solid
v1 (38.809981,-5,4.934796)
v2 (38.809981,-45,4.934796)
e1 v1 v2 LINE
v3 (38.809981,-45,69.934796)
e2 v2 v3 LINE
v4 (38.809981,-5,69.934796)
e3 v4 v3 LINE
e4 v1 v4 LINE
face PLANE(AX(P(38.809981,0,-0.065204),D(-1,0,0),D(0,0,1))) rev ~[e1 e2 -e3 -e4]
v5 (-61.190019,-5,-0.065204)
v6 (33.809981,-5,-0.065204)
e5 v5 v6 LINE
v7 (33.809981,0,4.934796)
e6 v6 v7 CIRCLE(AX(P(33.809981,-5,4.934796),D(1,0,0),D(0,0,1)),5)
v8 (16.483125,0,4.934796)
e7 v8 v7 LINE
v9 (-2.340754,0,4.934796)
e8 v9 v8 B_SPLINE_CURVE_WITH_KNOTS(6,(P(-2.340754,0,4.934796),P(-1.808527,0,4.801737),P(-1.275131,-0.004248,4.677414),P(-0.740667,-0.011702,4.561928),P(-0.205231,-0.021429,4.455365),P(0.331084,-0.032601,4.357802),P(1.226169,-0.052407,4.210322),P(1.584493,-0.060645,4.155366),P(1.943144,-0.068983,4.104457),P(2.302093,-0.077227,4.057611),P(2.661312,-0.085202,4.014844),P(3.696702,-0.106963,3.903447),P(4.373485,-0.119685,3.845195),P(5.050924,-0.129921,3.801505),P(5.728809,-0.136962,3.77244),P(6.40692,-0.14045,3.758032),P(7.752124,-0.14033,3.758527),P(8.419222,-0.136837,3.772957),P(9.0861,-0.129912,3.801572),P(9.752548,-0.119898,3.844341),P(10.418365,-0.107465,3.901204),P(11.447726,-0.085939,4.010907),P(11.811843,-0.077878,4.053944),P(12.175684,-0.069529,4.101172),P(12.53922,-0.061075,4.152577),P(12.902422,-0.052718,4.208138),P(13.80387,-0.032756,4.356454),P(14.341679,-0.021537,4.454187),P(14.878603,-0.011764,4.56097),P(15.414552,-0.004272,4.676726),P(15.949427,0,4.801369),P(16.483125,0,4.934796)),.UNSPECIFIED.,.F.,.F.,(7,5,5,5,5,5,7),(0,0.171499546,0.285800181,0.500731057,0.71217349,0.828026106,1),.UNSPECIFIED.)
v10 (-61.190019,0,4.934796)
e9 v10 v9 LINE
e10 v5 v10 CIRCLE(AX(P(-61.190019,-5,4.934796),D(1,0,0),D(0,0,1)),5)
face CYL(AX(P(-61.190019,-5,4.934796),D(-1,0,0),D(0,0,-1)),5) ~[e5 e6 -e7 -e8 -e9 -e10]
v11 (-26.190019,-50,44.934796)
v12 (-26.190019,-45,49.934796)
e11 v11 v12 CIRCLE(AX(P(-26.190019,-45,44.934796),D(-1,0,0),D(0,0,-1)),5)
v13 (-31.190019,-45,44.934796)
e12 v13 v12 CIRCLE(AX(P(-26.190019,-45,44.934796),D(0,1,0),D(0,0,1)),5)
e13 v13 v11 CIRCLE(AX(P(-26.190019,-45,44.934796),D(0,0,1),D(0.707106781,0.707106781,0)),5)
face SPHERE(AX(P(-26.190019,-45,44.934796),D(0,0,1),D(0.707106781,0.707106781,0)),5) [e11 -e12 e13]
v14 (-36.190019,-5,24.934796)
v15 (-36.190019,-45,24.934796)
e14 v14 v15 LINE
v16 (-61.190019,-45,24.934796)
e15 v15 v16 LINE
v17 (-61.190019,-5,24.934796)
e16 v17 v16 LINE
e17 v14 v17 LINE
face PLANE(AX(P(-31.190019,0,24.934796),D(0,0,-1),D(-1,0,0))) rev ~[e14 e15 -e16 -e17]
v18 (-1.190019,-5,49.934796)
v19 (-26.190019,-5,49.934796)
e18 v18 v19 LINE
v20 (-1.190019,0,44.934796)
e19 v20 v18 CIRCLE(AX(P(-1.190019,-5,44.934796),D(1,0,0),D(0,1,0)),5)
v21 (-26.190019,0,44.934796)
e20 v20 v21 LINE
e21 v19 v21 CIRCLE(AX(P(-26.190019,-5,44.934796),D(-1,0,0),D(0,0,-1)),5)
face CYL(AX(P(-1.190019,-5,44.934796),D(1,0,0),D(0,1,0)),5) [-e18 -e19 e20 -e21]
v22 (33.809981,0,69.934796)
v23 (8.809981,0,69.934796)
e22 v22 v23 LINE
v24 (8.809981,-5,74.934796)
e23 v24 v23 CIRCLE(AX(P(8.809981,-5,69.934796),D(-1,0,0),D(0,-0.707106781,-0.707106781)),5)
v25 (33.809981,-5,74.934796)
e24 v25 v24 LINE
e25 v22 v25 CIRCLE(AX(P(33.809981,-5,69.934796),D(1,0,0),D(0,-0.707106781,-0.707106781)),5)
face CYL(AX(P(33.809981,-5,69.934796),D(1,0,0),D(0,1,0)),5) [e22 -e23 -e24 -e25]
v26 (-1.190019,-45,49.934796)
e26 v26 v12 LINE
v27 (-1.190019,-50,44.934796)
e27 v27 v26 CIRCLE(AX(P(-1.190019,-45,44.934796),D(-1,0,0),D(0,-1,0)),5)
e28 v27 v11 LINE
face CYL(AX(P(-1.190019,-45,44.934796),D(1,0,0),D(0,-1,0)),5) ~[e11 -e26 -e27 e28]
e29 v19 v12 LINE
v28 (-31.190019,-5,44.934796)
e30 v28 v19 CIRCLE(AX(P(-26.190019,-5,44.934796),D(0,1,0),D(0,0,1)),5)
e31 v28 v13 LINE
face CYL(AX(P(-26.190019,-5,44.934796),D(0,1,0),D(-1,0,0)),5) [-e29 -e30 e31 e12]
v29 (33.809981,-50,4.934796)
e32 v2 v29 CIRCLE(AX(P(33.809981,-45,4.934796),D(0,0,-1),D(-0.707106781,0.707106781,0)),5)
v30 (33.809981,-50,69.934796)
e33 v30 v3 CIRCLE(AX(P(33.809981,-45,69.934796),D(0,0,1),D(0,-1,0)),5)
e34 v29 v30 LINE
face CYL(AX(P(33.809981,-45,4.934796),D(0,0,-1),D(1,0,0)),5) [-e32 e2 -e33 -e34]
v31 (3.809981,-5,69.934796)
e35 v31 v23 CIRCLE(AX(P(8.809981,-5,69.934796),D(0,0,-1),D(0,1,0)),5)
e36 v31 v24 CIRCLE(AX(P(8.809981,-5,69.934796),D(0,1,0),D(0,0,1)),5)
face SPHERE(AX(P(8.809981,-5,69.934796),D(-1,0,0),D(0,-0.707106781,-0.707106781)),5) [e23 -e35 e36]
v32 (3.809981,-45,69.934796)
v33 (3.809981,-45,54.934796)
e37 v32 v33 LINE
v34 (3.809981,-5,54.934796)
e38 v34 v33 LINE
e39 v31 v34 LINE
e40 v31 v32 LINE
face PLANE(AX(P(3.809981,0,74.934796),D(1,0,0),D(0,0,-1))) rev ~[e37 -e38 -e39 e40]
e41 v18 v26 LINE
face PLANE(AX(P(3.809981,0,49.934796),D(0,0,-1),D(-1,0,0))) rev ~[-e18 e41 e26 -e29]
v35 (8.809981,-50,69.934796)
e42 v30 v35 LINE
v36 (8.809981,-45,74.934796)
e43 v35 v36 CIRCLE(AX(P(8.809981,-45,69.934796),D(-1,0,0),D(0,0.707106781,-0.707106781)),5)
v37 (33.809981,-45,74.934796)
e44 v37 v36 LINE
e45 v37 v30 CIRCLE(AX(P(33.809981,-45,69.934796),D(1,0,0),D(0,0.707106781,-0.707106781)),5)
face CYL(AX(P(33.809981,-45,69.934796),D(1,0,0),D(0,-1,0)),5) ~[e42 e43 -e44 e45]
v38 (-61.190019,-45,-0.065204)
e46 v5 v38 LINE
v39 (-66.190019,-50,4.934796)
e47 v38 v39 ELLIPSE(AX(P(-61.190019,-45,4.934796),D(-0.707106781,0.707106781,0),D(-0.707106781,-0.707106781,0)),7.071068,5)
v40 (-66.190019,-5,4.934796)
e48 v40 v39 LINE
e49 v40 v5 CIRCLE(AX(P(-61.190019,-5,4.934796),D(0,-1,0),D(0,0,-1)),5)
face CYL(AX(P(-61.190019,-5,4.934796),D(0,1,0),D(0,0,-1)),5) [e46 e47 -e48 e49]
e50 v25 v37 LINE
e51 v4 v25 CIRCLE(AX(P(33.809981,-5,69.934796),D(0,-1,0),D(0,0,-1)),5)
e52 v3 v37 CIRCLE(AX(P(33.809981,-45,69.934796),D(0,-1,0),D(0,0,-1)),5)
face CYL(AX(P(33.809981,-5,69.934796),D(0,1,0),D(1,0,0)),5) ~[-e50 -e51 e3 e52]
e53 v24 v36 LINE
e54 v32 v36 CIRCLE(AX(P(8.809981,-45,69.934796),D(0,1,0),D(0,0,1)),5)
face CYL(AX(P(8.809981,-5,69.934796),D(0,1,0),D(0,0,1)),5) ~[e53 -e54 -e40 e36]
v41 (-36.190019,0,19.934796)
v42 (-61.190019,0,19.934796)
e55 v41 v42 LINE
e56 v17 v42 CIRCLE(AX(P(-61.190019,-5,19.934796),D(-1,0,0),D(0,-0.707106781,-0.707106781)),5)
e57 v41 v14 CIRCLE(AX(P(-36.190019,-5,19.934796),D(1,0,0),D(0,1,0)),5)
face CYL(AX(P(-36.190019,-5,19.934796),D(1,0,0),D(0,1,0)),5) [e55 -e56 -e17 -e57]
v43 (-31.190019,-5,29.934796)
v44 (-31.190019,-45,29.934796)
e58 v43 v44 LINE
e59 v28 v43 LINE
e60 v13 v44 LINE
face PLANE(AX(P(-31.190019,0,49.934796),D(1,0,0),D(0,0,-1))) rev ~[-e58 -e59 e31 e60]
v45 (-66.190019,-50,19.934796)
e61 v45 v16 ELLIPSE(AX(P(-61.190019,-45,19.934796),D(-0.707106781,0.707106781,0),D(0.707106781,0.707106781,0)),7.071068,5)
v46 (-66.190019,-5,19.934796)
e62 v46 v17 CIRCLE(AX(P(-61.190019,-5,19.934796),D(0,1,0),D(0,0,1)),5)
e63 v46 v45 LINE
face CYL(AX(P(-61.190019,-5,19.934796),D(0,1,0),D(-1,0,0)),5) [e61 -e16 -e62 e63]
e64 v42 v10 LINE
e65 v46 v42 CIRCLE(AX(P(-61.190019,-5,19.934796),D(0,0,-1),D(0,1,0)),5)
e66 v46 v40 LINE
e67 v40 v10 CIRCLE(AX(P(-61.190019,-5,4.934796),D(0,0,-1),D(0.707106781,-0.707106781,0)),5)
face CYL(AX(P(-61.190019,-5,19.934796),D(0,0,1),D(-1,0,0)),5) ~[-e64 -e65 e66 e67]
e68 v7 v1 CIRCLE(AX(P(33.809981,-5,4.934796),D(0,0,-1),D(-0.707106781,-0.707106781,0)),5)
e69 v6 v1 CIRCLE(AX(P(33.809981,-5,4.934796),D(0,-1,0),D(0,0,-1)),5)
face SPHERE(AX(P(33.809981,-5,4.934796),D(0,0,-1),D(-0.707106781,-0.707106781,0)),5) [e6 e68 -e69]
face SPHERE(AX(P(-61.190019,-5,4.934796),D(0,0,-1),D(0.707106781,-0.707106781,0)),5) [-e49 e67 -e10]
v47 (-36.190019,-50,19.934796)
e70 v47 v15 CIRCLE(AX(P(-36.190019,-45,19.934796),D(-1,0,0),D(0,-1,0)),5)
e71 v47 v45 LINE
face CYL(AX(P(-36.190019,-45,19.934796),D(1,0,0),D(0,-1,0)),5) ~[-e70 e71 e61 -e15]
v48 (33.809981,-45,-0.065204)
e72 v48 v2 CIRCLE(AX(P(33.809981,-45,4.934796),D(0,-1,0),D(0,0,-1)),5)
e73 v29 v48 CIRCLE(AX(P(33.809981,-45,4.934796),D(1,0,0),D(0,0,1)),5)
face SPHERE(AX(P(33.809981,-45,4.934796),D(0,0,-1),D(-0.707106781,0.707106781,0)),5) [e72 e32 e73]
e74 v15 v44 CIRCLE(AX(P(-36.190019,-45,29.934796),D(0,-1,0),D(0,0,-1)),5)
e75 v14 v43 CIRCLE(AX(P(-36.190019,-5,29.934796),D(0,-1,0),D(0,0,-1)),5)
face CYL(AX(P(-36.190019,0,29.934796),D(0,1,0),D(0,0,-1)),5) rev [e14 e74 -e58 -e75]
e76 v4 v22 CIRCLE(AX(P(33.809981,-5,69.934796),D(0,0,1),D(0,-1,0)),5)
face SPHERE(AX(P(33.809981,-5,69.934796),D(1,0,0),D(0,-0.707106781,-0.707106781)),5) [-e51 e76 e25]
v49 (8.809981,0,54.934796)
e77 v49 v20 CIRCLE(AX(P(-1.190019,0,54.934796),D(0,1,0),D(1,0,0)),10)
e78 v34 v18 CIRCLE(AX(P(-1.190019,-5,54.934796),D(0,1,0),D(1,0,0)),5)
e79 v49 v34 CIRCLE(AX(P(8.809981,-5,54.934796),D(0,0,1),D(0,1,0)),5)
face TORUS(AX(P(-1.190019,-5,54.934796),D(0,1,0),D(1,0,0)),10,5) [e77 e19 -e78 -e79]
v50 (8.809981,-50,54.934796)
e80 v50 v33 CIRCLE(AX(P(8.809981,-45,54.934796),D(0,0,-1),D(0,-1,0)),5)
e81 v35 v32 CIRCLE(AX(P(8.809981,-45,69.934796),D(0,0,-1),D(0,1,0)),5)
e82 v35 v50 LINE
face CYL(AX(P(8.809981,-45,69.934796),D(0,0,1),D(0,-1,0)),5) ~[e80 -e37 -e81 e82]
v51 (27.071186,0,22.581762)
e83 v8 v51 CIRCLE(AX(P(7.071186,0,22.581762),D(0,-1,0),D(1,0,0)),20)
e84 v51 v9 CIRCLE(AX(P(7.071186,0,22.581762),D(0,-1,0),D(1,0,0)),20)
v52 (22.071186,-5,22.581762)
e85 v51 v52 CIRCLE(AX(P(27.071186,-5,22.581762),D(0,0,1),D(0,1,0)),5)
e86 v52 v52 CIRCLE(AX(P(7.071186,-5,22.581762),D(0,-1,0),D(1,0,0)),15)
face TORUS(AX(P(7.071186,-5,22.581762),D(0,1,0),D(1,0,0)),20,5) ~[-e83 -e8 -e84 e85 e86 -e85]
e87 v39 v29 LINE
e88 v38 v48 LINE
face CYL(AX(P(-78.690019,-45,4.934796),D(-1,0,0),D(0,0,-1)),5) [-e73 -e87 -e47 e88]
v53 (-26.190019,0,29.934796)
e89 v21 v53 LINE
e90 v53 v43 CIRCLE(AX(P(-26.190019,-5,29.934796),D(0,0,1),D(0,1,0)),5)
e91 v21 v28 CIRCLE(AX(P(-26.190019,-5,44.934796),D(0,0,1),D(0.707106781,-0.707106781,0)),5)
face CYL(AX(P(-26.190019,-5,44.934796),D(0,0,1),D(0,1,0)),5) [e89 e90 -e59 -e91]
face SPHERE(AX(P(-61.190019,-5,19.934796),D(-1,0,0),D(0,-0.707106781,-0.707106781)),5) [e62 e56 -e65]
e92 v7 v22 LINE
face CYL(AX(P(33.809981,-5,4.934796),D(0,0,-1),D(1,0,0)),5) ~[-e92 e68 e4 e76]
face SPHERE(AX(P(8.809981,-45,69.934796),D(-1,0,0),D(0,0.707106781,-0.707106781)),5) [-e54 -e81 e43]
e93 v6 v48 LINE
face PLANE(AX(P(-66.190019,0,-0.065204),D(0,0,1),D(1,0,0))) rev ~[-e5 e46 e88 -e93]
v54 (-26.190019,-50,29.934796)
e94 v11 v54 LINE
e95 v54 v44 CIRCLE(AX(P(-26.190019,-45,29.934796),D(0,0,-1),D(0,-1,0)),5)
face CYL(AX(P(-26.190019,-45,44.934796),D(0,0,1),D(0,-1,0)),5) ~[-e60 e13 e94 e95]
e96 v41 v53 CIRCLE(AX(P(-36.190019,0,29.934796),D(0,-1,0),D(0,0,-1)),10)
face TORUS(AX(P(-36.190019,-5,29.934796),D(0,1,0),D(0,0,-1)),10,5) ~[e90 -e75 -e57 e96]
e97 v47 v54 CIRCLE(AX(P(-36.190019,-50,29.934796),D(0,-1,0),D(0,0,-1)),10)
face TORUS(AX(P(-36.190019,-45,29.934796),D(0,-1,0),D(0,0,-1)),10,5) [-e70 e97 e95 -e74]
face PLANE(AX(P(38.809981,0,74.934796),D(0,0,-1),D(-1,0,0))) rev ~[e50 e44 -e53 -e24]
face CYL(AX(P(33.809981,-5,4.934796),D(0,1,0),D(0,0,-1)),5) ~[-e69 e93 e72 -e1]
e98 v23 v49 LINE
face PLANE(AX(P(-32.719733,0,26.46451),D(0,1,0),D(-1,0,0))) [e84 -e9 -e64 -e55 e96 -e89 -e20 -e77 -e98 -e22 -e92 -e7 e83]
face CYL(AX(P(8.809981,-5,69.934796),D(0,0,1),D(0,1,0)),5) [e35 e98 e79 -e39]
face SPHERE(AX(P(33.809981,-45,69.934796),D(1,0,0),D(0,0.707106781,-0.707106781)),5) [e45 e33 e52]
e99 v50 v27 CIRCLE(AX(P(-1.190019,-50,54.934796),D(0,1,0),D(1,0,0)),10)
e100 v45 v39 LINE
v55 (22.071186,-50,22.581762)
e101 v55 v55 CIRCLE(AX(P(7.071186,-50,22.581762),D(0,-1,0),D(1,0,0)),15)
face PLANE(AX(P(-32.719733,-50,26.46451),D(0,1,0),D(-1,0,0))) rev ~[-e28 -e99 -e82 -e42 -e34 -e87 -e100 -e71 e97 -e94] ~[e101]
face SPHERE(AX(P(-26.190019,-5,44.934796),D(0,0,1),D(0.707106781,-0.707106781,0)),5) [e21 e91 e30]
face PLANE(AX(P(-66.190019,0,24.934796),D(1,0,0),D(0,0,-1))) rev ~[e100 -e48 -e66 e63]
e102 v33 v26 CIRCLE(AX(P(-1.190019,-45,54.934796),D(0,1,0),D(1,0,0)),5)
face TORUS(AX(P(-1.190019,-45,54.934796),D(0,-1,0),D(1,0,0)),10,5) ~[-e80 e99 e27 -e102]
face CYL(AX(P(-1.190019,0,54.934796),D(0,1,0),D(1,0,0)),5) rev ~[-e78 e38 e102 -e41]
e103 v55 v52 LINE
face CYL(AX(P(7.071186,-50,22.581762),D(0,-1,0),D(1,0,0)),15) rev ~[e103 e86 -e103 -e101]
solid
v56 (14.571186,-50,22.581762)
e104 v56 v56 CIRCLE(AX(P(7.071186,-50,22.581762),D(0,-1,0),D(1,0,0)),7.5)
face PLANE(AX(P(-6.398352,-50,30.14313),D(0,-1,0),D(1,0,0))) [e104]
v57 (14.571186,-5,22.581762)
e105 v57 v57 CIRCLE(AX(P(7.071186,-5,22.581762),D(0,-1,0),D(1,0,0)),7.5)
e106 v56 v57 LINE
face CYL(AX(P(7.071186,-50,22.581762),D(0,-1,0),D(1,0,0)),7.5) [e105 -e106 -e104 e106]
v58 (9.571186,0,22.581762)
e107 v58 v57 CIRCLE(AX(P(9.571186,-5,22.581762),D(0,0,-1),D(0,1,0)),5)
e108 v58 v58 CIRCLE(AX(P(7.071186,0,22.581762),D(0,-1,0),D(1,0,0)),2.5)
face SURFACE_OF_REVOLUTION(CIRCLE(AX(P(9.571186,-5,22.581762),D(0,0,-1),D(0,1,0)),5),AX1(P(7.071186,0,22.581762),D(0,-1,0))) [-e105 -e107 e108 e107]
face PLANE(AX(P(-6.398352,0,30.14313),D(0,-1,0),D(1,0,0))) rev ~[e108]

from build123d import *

# Parameters (mm, degrees)
F1_DEPTH      = 50
F2_R          = 15
F2_R_2        = 7.5
F3_DEPTH      = 50
F4_T3_DEPTH   = 50
F4_T6_DEPTH   = 50
F4_S9_W       = 5.1
F4_S9_H       = 5.1
F4_T10_DEPTH  = 5.1
F4_S14_W      = 5.1
F4_S14_H      = 5.1
F4_T15_DEPTH  = 5.1
F4_S19_W      = 5.1
F4_S19_H      = 5.1
F4_T20_DEPTH  = 5.1
F4_S24_W      = 5.1
F4_S24_H      = 5.1
F4_T25_DEPTH  = 5.1
F4_S29_W      = 5.1
F4_S29_H      = 5.1
F4_T30_DEPTH  = 5.1
F4_S34_W      = 5.1
F4_S34_H      = 5.1
F4_T35_DEPTH  = 5.1
F4_S39_W      = 5.1
F4_S39_H      = 5.1
F4_T40_DEPTH  = 5.1
F4_S44_W      = 5.1
F4_S44_H      = 5.1
F4_T45_DEPTH  = 5.1
F4_S49_W      = 5.1
F4_S49_H      = 5.1
F4_T50_DEPTH  = 5.1
F4_S54_W      = 5.1
F4_S54_H      = 5.1
F4_T55_DEPTH  = 5.1
F4_T60_DEPTH  = 57.5
F4_T63_DEPTH  = 40
F4_T66_DEPTH  = 40
F4_T69_DEPTH  = 40
F4_T72_DEPTH  = 25
F4_T75_DEPTH  = 25
F4_T78_DEPTH  = 25
F4_T81_DEPTH  = 42.5
F4_T84_DEPTH  = 25
F4_T87_DEPTH  = 25
F4_T93_DEPTH  = 112.5
F4_T96_DEPTH  = 57.5
F4_T99_DEPTH  = 40
F4_T102_DEPTH = 95
F4_T105_DEPTH = 65
F4_T108_DEPTH = 15
F4_T111_DEPTH = 65
F4_T114_DEPTH = 15
F4_T117_DEPTH = 15
F4_T120_DEPTH = 15
F4_T123_DEPTH = 15
F4_T126_ANGLE = 90
F4_T129_ANGLE = 90
F4_T132_ANGLE = 90
F4_T135_ANGLE = 90


# Not quite as in the source:
# - a fillet or chamfer that OpenCascade refuses, or shapes differently, is made with other operations: its cross-section is extruded or revolved along the edge and cut away or added


with BuildPart() as f1:
    # F0 (on Front) → F1 (new body)
    with BuildSketch(Plane.XZ):
        Polygon((-66.1900187428, 24.934796177), (-66.1900187428, -0.065203823), (38.8099812572, -0.065203823), (38.8099812572, 74.934796177), (3.8099812572, 74.934796177), (3.8099812572, 49.934796177), (-31.1900187428, 49.934796177), (-31.1900187428, 24.934796177), align=None)
    extrude(amount=F1_DEPTH)

    # F2 (on face) → F3 (cut, through all)
    with BuildSketch(Plane.XZ.offset(50)):
        with Locations((7.0711858571, 22.5817617029)):
            Circle(F2_R)
        with Locations((7.0711858571, 22.5817617029)):
            Circle(F2_R_2, mode=Mode.SUBTRACT)
    extrude(amount=-F3_DEPTH, mode=Mode.SUBTRACT)

    # F4: fillet of radius 5 on 24 edges, made by hand


with BuildPart() as f4_tool1:
    # F4_s2 → F4_t3 (new body)
    with BuildSketch(Plane.XZ):
        with BuildLine():
            ThreePointArc((-36.1900187428, 24.934796177), (-32.6544848368, 26.3992622711), (-31.1900187428, 29.934796177))
            Line((-31.1900187428, 29.934796177), (-31.1900187428, 24.934796177))
            Line((-31.1900187428, 24.934796177), (-36.1900187428, 24.934796177))
        make_face()
    extrude(amount=F4_T3_DEPTH)


with BuildPart() as f4_tool4:
    # F4_s5 → F4_t6 (new body)
    with BuildSketch(Plane.XZ):
        with BuildLine():
            ThreePointArc((3.8099812572, 54.934796177), (2.3455151632, 51.3992622711), (-1.1900187428, 49.934796177))
            Line((-1.1900187428, 49.934796177), (3.8099812572, 49.934796177))
            Line((3.8099812572, 49.934796177), (3.8099812572, 54.934796177))
        make_face()
    extrude(amount=F4_T6_DEPTH)


with BuildPart() as f1_1:
    add(f1.part)

    # F4_t7: union F4_tool1, F4_tool4
    add([f4_tool1.part, f4_tool4.part])


with BuildPart() as f4_tool8:
    # F4_s9 → F4_t10 (new body)
    with BuildSketch(Plane.YZ.offset(-61.1900187428)):
        with Locations((-2.45, 22.484796177)):
            Rectangle(F4_S9_W, F4_S9_H)
    extrude(amount=-F4_T10_DEPTH)

    # F4_s11 → F4_t12 (revolve, cut)
    with BuildSketch(Plane(origin=(-61.1900187428, -5, 19.934796177), x_dir=(0, -0.7071067812, -0.7071067812), z_dir=(0, 0.7071067812, -0.7071067812))):
        with BuildLine():
            ThreePointArc((0, -5), (5, 0), (0, 5))
            Line((0, 5), (0, -5))
        make_face()
    revolve(axis=Axis((-61.1900187428, -5, 19.934796177), (-1, 0, 0)), mode=Mode.SUBTRACT)


with BuildPart() as f4_tool13:
    # F4_s14 → F4_t15 (new body)
    with BuildSketch(Plane.XY.offset(44.934796177)):
        with Locations((-28.7400187428, -2.45)):
            Rectangle(F4_S14_W, F4_S14_H)
    extrude(amount=F4_T15_DEPTH)

    # F4_s16 → F4_t17 (revolve, cut)
    with BuildSketch(Plane(origin=(-26.1900187428, -5, 44.934796177), x_dir=(0.7071067812, -0.7071067812, 0), z_dir=(-0.7071067812, -0.7071067812, 0))):
        with BuildLine():
            ThreePointArc((0, -5), (5, 0), (0, 5))
            Line((0, 5), (0, -5))
        make_face()
    revolve(axis=Axis((-26.1900187428, -5, 44.934796177), (0, 0, 1)), mode=Mode.SUBTRACT)


with BuildPart() as f4_tool18:
    # F4_s19 → F4_t20 (new body)
    with BuildSketch(Plane.XY.offset(44.934796177)):
        with Locations((-28.7400187428, -47.55)):
            Rectangle(F4_S19_W, F4_S19_H)
    extrude(amount=F4_T20_DEPTH)

    # F4_s21 → F4_t22 (revolve, cut)
    with BuildSketch(Plane(origin=(-26.1900187428, -45, 44.934796177), x_dir=(0.7071067812, 0.7071067812, 0), z_dir=(0.7071067812, -0.7071067812, 0))):
        with BuildLine():
            ThreePointArc((0, -5), (5, 0), (0, 5))
            Line((0, 5), (0, -5))
        make_face()
    revolve(axis=Axis((-26.1900187428, -45, 44.934796177), (0, 0, 1)), mode=Mode.SUBTRACT)


with BuildPart() as f4_tool23:
    # F4_s24 → F4_t25 (new body)
    with BuildSketch(Plane.YZ.offset(8.8099812572)):
        with Locations((-2.45, 72.484796177)):
            Rectangle(F4_S24_W, F4_S24_H)
    extrude(amount=-F4_T25_DEPTH)

    # F4_s26 → F4_t27 (revolve, cut)
    with BuildSketch(Plane(origin=(8.8099812572, -5, 69.934796177), x_dir=(0, -0.7071067812, -0.7071067812), z_dir=(0, 0.7071067812, -0.7071067812))):
        with BuildLine():
            ThreePointArc((0, -5), (5, 0), (0, 5))
            Line((0, 5), (0, -5))
        make_face()
    revolve(axis=Axis((8.8099812572, -5, 69.934796177), (-1, 0, 0)), mode=Mode.SUBTRACT)


with BuildPart() as f4_tool28:
    # F4_s29 → F4_t30 (new body)
    with BuildSketch(Plane.YZ.offset(8.8099812572)):
        with Locations((-47.55, 72.484796177)):
            Rectangle(F4_S29_W, F4_S29_H)
    extrude(amount=-F4_T30_DEPTH)

    # F4_s31 → F4_t32 (revolve, cut)
    with BuildSketch(Plane(origin=(8.8099812572, -45, 69.934796177), x_dir=(0, 0.7071067812, -0.7071067812), z_dir=(0, 0.7071067812, 0.7071067812))):
        with BuildLine():
            ThreePointArc((0, -5), (5, 0), (0, 5))
            Line((0, 5), (0, -5))
        make_face()
    revolve(axis=Axis((8.8099812572, -45, 69.934796177), (-1, 0, 0)), mode=Mode.SUBTRACT)


with BuildPart() as f4_tool33:
    # F4_s34 → F4_t35 (new body)
    with BuildSketch(Plane.YZ.offset(33.8099812572)):
        with Locations((-2.45, 72.484796177)):
            Rectangle(F4_S34_W, F4_S34_H)
    extrude(amount=F4_T35_DEPTH)

    # F4_s36 → F4_t37 (revolve, cut)
    with BuildSketch(Plane(origin=(33.8099812572, -5, 69.934796177), x_dir=(0, -0.7071067812, -0.7071067812), z_dir=(0, -0.7071067812, 0.7071067812))):
        with BuildLine():
            ThreePointArc((0, -5), (5, 0), (0, 5))
            Line((0, 5), (0, -5))
        make_face()
    revolve(axis=Axis((33.8099812572, -5, 69.934796177), (1, 0, 0)), mode=Mode.SUBTRACT)


with BuildPart() as f4_tool38:
    # F4_s39 → F4_t40 (new body)
    with BuildSketch(Plane.YZ.offset(33.8099812572)):
        with Locations((-47.55, 72.484796177)):
            Rectangle(F4_S39_W, F4_S39_H)
    extrude(amount=F4_T40_DEPTH)

    # F4_s41 → F4_t42 (revolve, cut)
    with BuildSketch(Plane(origin=(33.8099812572, -45, 69.934796177), x_dir=(0, 0.7071067812, -0.7071067812), z_dir=(0, -0.7071067812, -0.7071067812))):
        with BuildLine():
            ThreePointArc((0, -5), (5, 0), (0, 5))
            Line((0, 5), (0, -5))
        make_face()
    revolve(axis=Axis((33.8099812572, -45, 69.934796177), (1, 0, 0)), mode=Mode.SUBTRACT)


with BuildPart() as f4_tool43:
    # F4_s44 → F4_t45 (new body)
    with BuildSketch(Plane.XY.offset(4.934796177)):
        with Locations((36.3599812572, -47.55)):
            Rectangle(F4_S44_W, F4_S44_H)
    extrude(amount=-F4_T45_DEPTH)

    # F4_s46 → F4_t47 (revolve, cut)
    with BuildSketch(Plane(origin=(33.8099812572, -45, 4.934796177), x_dir=(-0.7071067812, 0.7071067812, 0), z_dir=(-0.7071067812, -0.7071067812, 0))):
        with BuildLine():
            ThreePointArc((0, -5), (5, 0), (0, 5))
            Line((0, 5), (0, -5))
        make_face()
    revolve(axis=Axis((33.8099812572, -45, 4.934796177), (0, 0, -1)), mode=Mode.SUBTRACT)


with BuildPart() as f4_tool48:
    # F4_s49 → F4_t50 (new body)
    with BuildSketch(Plane.XY.offset(4.934796177)):
        with Locations((-63.7400187428, -2.45)):
            Rectangle(F4_S49_W, F4_S49_H)
    extrude(amount=-F4_T50_DEPTH)

    # F4_s51 → F4_t52 (revolve, cut)
    with BuildSketch(Plane(origin=(-61.1900187428, -5, 4.934796177), x_dir=(0.7071067812, -0.7071067812, 0), z_dir=(0.7071067812, 0.7071067812, 0))):
        with BuildLine():
            ThreePointArc((0, -5), (5, 0), (0, 5))
            Line((0, 5), (0, -5))
        make_face()
    revolve(axis=Axis((-61.1900187428, -5, 4.934796177), (0, 0, -1)), mode=Mode.SUBTRACT)


with BuildPart() as f4_tool53:
    # F4_s54 → F4_t55 (new body)
    with BuildSketch(Plane.XY.offset(4.934796177)):
        with Locations((36.3599812572, -2.45)):
            Rectangle(F4_S54_W, F4_S54_H)
    extrude(amount=-F4_T55_DEPTH)

    # F4_s56 → F4_t57 (revolve, cut)
    with BuildSketch(Plane(origin=(33.8099812572, -5, 4.934796177), x_dir=(-0.7071067812, -0.7071067812, 0), z_dir=(0.7071067812, -0.7071067812, 0))):
        with BuildLine():
            ThreePointArc((0, -5), (5, 0), (0, 5))
            Line((0, 5), (0, -5))
        make_face()
    revolve(axis=Axis((33.8099812572, -5, 4.934796177), (0, 0, -1)), mode=Mode.SUBTRACT)


with BuildPart() as f4_tool58:
    # F4_s59 → F4_t60 (new body)
    with BuildSketch(Plane.XZ.offset(5)):
        with BuildLine():
            ThreePointArc((-66.1900187428, 19.934796177), (-64.7255526487, 23.470330083), (-61.1900187428, 24.934796177))
            Line((-61.1900187428, 24.934796177), (-66.1900187428, 24.934796177))
            Line((-66.1900187428, 24.934796177), (-66.1900187428, 19.934796177))
        make_face()
    extrude(amount=F4_T60_DEPTH)


with BuildPart() as f4_tool61:
    # F4_s62 → F4_t63 (new body)
    with BuildSketch(Plane.XZ.offset(5)):
        with BuildLine():
            ThreePointArc((-31.1900187428, 44.934796177), (-29.7255526487, 48.470330083), (-26.1900187428, 49.934796177))
            Line((-26.1900187428, 49.934796177), (-31.1900187428, 49.934796177))
            Line((-31.1900187428, 49.934796177), (-31.1900187428, 44.934796177))
        make_face()
    extrude(amount=F4_T63_DEPTH)


with BuildPart() as f4_tool64:
    # F4_s65 → F4_t66 (new body)
    with BuildSketch(Plane.XZ.offset(5)):
        with BuildLine():
            ThreePointArc((8.8099812572, 74.934796177), (5.2744473513, 73.470330083), (3.8099812572, 69.934796177))
            Line((3.8099812572, 69.934796177), (3.8099812572, 74.934796177))
            Line((3.8099812572, 74.934796177), (8.8099812572, 74.934796177))
        make_face()
    extrude(amount=F4_T66_DEPTH)


with BuildPart() as f4_tool67:
    # F4_s68 → F4_t69 (new body)
    with BuildSketch(Plane.XZ.offset(5)):
        with BuildLine():
            ThreePointArc((38.8099812572, 69.934796177), (37.3455151632, 73.470330083), (33.8099812572, 74.934796177))
            Line((33.8099812572, 74.934796177), (38.8099812572, 74.934796177))
            Line((38.8099812572, 74.934796177), (38.8099812572, 69.934796177))
        make_face()
    extrude(amount=F4_T69_DEPTH)


with BuildPart() as f4_tool70:
    # F4_s71 → F4_t72 (new body)
    with BuildSketch(Plane.YZ.offset(33.8099812572)):
        with BuildLine():
            ThreePointArc((0, 69.934796177), (-1.4644660941, 73.470330083), (-5, 74.934796177))
            Line((-5, 74.934796177), (0, 74.934796177))
            Line((0, 74.934796177), (0, 69.934796177))
        make_face()
    extrude(amount=-F4_T72_DEPTH)


with BuildPart() as f4_tool73:
    # F4_s74 → F4_t75 (new body)
    with BuildSketch(Plane.YZ.offset(33.8099812572)):
        with BuildLine():
            ThreePointArc((-50, 69.934796177), (-48.5355339059, 73.470330083), (-45, 74.934796177))
            Line((-45, 74.934796177), (-50, 74.934796177))
            Line((-50, 74.934796177), (-50, 69.934796177))
        make_face()
    extrude(amount=-F4_T75_DEPTH)


with BuildPart() as f4_tool76:
    # F4_s77 → F4_t78 (new body)
    with BuildSketch(Plane.YZ.offset(-1.1900187428)):
        with BuildLine():
            ThreePointArc((-50, 44.934796177), (-48.5355339059, 48.470330083), (-45, 49.934796177))
            Line((-45, 49.934796177), (-50, 49.934796177))
            Line((-50, 49.934796177), (-50, 44.934796177))
        make_face()
    extrude(amount=-F4_T78_DEPTH)


with BuildPart() as f4_tool79:
    # F4_s80 → F4_t81 (new body)
    with BuildSketch(Plane.YZ.offset(-36.1900187428)):
        with BuildLine():
            ThreePointArc((-50, 19.934796177), (-48.5355339059, 23.470330083), (-45, 24.934796177))
            Line((-45, 24.934796177), (-50, 24.934796177))
            Line((-50, 24.934796177), (-50, 19.934796177))
        make_face()
    extrude(amount=-F4_T81_DEPTH)


with BuildPart() as f4_tool82:
    # F4_s83 → F4_t84 (new body)
    with BuildSketch(Plane.YZ.offset(-1.1900187428)):
        with BuildLine():
            ThreePointArc((0, 44.934796177), (-1.4644660941, 48.470330083), (-5, 49.934796177))
            Line((-5, 49.934796177), (0, 49.934796177))
            Line((0, 49.934796177), (0, 44.934796177))
        make_face()
    extrude(amount=-F4_T84_DEPTH)


with BuildPart() as f4_tool85:
    # F4_s86 → F4_t87 (new body)
    with BuildSketch(Plane.YZ.offset(-36.1900187428)):
        with BuildLine():
            ThreePointArc((0, 19.934796177), (-1.4644660941, 23.470330083), (-5, 24.934796177))
            Line((-5, 24.934796177), (0, 24.934796177))
            Line((0, 24.934796177), (0, 19.934796177))
        make_face()
    extrude(amount=-F4_T87_DEPTH)


with BuildPart() as f4_tool88:
    # F4_s89 → F4_t90 (revolve)
    with BuildSketch(Plane.XY.offset(22.5817617029)):
        with BuildLine():
            ThreePointArc((27.0711858571, 0), (23.5356519511, -1.4644660941), (22.0711858571, -5))
            Line((22.0711858571, -5), (22.0711858571, 0))
            Line((22.0711858571, 0), (27.0711858571, 0))
        make_face()
    revolve(axis=Axis((7.0711858571, 0, 22.5817617029), (0, -1, 0)))


with BuildPart() as f4_tool91:
    # F4_s92 → F4_t93 (new body)
    with BuildSketch(Plane.YZ.offset(-78.6900187428)):
        with BuildLine():
            ThreePointArc((-45, -0.065203823), (-48.5355339059, 1.3992622711), (-50, 4.934796177))
            Line((-50, 4.934796177), (-50, -0.065203823))
            Line((-50, -0.065203823), (-45, -0.065203823))
        make_face()
    extrude(amount=F4_T93_DEPTH)


with BuildPart() as f4_tool94:
    # F4_s95 → F4_t96 (new body)
    with BuildSketch(Plane.XZ.offset(5)):
        with BuildLine():
            ThreePointArc((-61.1900187428, -0.065203823), (-64.7255526487, 1.3992622711), (-66.1900187428, 4.934796177))
            Line((-66.1900187428, 4.934796177), (-66.1900187428, -0.065203823))
            Line((-66.1900187428, -0.065203823), (-61.1900187428, -0.065203823))
        make_face()
    extrude(amount=F4_T96_DEPTH)


with BuildPart() as f4_tool97:
    # F4_s98 → F4_t99 (new body)
    with BuildSketch(Plane.XZ.offset(5)):
        with BuildLine():
            ThreePointArc((33.8099812572, -0.065203823), (37.3455151632, 1.3992622711), (38.8099812572, 4.934796177))
            Line((38.8099812572, 4.934796177), (38.8099812572, -0.065203823))
            Line((38.8099812572, -0.065203823), (33.8099812572, -0.065203823))
        make_face()
    extrude(amount=F4_T99_DEPTH)


with BuildPart() as f4_tool100:
    # F4_s101 → F4_t102 (new body)
    with BuildSketch(Plane.YZ.offset(-61.1900187428)):
        with BuildLine():
            ThreePointArc((-5, -0.065203823), (-1.4644660941, 1.3992622711), (0, 4.934796177))
            Line((0, 4.934796177), (0, -0.065203823))
            Line((0, -0.065203823), (-5, -0.065203823))
        make_face()
    extrude(amount=F4_T102_DEPTH)


with BuildPart() as f4_tool103:
    # F4_s104 → F4_t105 (new body)
    with BuildSketch(Plane.XY.offset(4.934796177)):
        with BuildLine():
            ThreePointArc((38.8099812572, -5), (37.3455151632, -1.4644660941), (33.8099812572, 0))
            Line((33.8099812572, 0), (38.8099812572, 0))
            Line((38.8099812572, 0), (38.8099812572, -5))
        make_face()
    extrude(amount=F4_T105_DEPTH)


with BuildPart() as f4_tool106:
    # F4_s107 → F4_t108 (new body)
    with BuildSketch(Plane.XY.offset(19.934796177)):
        with BuildLine():
            ThreePointArc((-66.1900187428, -5), (-64.7255526487, -1.4644660941), (-61.1900187428, 0))
            Line((-61.1900187428, 0), (-66.1900187428, 0))
            Line((-66.1900187428, 0), (-66.1900187428, -5))
        make_face()
    extrude(amount=-F4_T108_DEPTH)


with BuildPart() as f4_tool109:
    # F4_s110 → F4_t111 (new body)
    with BuildSketch(Plane.XY.offset(4.934796177)):
        with BuildLine():
            ThreePointArc((38.8099812572, -45), (37.3455151632, -48.5355339059), (33.8099812572, -50))
            Line((33.8099812572, -50), (38.8099812572, -50))
            Line((38.8099812572, -50), (38.8099812572, -45))
        make_face()
    extrude(amount=F4_T111_DEPTH)


with BuildPart() as f4_tool112:
    # F4_s113 → F4_t114 (new body)
    with BuildSketch(Plane.XY.offset(44.934796177)):
        with BuildLine():
            ThreePointArc((-26.1900187428, 0), (-29.7255526487, -1.4644660941), (-31.1900187428, -5))
            Line((-31.1900187428, -5), (-31.1900187428, 0))
            Line((-31.1900187428, 0), (-26.1900187428, 0))
        make_face()
    extrude(amount=-F4_T114_DEPTH)


with BuildPart() as f4_tool115:
    # F4_s116 → F4_t117 (new body)
    with BuildSketch(Plane.XY.offset(69.934796177)):
        with BuildLine():
            ThreePointArc((8.8099812572, 0), (5.2744473513, -1.4644660941), (3.8099812572, -5))
            Line((3.8099812572, -5), (3.8099812572, 0))
            Line((3.8099812572, 0), (8.8099812572, 0))
        make_face()
    extrude(amount=-F4_T117_DEPTH)


with BuildPart() as f4_tool118:
    # F4_s119 → F4_t120 (new body)
    with BuildSketch(Plane.XY.offset(44.934796177)):
        with BuildLine():
            ThreePointArc((-26.1900187428, -50), (-29.7255526487, -48.5355339059), (-31.1900187428, -45))
            Line((-31.1900187428, -45), (-31.1900187428, -50))
            Line((-31.1900187428, -50), (-26.1900187428, -50))
        make_face()
    extrude(amount=-F4_T120_DEPTH)


with BuildPart() as f4_tool121:
    # F4_s122 → F4_t123 (new body)
    with BuildSketch(Plane.XY.offset(69.934796177)):
        with BuildLine():
            ThreePointArc((8.8099812572, -50), (5.2744473513, -48.5355339059), (3.8099812572, -45))
            Line((3.8099812572, -45), (3.8099812572, -50))
            Line((3.8099812572, -50), (8.8099812572, -50))
        make_face()
    extrude(amount=-F4_T123_DEPTH)


with BuildPart() as f4_tool124:
    # F4_s125 → F4_t126 (revolve)
    with BuildSketch(Plane.XY.offset(54.934796177)):
        with BuildLine():
            ThreePointArc((8.8099812572, -50), (5.2744473513, -48.5355339059), (3.8099812572, -45))
            Line((3.8099812572, -45), (3.8099812572, -50))
            Line((3.8099812572, -50), (8.8099812572, -50))
        make_face()
    revolve(axis=Axis((-1.1900187428, -50, 54.934796177), (0, 1, 0)), revolution_arc=F4_T126_ANGLE)


with BuildPart() as f4_tool127:
    # F4_s128 → F4_t129 (revolve)
    with BuildSketch(Plane.YZ.offset(-36.1900187428)):
        with BuildLine():
            ThreePointArc((-50, 19.934796177), (-48.5355339059, 23.470330083), (-45, 24.934796177))
            Line((-45, 24.934796177), (-50, 24.934796177))
            Line((-50, 24.934796177), (-50, 19.934796177))
        make_face()
    revolve(axis=Axis((-36.1900187428, -50, 29.934796177), (0, -1, 0)), revolution_arc=F4_T129_ANGLE)


with BuildPart() as f4_tool130:
    # F4_s131 → F4_t132 (revolve)
    with BuildSketch(Plane.XY.offset(54.934796177)):
        with BuildLine():
            ThreePointArc((8.8099812572, 0), (5.2744473513, -1.4644660941), (3.8099812572, -5))
            Line((3.8099812572, -5), (3.8099812572, 0))
            Line((3.8099812572, 0), (8.8099812572, 0))
        make_face()
    revolve(axis=Axis((-1.1900187428, 0, 54.934796177), (0, 1, 0)), revolution_arc=F4_T132_ANGLE)


with BuildPart() as f4_tool133:
    # F4_s134 → F4_t135 (revolve)
    with BuildSketch(Plane.YZ.offset(-36.1900187428)):
        with BuildLine():
            ThreePointArc((0, 19.934796177), (-1.4644660941, 23.470330083), (-5, 24.934796177))
            Line((-5, 24.934796177), (0, 24.934796177))
            Line((0, 24.934796177), (0, 19.934796177))
        make_face()
    revolve(axis=Axis((-36.1900187428, 0, 29.934796177), (0, -1, 0)), revolution_arc=F4_T135_ANGLE)


with BuildPart() as f1_2:
    add(f1_1.part)

    # F4_t136: cut F4_tool8, F4_tool13, F4_tool18, F4_tool23, F4_tool28, F4_tool33, F4_tool38, F4_tool43, F4_tool48, F4_tool53, F4_tool58, F4_tool61, F4_tool64, F4_tool67, F4_tool70, F4_tool73, F4_tool76, F4_tool79, F4_tool82, F4_tool85, F4_tool88, F4_tool91, F4_tool94, F4_tool97, F4_tool100, F4_tool103, F4_tool106, F4_tool109, F4_tool112, F4_tool115, F4_tool118, F4_tool121, F4_tool124, F4_tool127, F4_tool130, F4_tool133
    add([f4_tool8.part, f4_tool13.part, f4_tool18.part, f4_tool23.part, f4_tool28.part, f4_tool33.part, f4_tool38.part, f4_tool43.part, f4_tool48.part, f4_tool53.part, f4_tool58.part, f4_tool61.part, f4_tool64.part, f4_tool67.part, f4_tool70.part, f4_tool73.part, f4_tool76.part, f4_tool79.part, f4_tool82.part, f4_tool85.part, f4_tool88.part, f4_tool91.part, f4_tool94.part, f4_tool97.part, f4_tool100.part, f4_tool103.part, f4_tool106.part, f4_tool109.part, f4_tool112.part, f4_tool115.part, f4_tool118.part, f4_tool121.part, f4_tool124.part, f4_tool127.part, f4_tool130.part, f4_tool133.part], mode=Mode.SUBTRACT)

    # F4#s1: fillet of radius 5 on 1 edges, made by hand

    # F4_s1_s1 → F4_s1_t2 (revolve, cut)
    with BuildSketch(Plane.XY.offset(22.5817617029)):
        with BuildLine():
            ThreePointArc((9.5711858571, 0), (13.106719763, -1.4644660941), (14.5711858571, -5))
            Line((14.5711858571, -5), (14.5711858571, 0))
            Line((14.5711858571, 0), (9.5711858571, 0))
        make_face()
    revolve(axis=Axis((7.0711858571, 0, 22.5817617029), (0, -1, 0)), mode=Mode.SUBTRACT)


solid = f1_2.part
